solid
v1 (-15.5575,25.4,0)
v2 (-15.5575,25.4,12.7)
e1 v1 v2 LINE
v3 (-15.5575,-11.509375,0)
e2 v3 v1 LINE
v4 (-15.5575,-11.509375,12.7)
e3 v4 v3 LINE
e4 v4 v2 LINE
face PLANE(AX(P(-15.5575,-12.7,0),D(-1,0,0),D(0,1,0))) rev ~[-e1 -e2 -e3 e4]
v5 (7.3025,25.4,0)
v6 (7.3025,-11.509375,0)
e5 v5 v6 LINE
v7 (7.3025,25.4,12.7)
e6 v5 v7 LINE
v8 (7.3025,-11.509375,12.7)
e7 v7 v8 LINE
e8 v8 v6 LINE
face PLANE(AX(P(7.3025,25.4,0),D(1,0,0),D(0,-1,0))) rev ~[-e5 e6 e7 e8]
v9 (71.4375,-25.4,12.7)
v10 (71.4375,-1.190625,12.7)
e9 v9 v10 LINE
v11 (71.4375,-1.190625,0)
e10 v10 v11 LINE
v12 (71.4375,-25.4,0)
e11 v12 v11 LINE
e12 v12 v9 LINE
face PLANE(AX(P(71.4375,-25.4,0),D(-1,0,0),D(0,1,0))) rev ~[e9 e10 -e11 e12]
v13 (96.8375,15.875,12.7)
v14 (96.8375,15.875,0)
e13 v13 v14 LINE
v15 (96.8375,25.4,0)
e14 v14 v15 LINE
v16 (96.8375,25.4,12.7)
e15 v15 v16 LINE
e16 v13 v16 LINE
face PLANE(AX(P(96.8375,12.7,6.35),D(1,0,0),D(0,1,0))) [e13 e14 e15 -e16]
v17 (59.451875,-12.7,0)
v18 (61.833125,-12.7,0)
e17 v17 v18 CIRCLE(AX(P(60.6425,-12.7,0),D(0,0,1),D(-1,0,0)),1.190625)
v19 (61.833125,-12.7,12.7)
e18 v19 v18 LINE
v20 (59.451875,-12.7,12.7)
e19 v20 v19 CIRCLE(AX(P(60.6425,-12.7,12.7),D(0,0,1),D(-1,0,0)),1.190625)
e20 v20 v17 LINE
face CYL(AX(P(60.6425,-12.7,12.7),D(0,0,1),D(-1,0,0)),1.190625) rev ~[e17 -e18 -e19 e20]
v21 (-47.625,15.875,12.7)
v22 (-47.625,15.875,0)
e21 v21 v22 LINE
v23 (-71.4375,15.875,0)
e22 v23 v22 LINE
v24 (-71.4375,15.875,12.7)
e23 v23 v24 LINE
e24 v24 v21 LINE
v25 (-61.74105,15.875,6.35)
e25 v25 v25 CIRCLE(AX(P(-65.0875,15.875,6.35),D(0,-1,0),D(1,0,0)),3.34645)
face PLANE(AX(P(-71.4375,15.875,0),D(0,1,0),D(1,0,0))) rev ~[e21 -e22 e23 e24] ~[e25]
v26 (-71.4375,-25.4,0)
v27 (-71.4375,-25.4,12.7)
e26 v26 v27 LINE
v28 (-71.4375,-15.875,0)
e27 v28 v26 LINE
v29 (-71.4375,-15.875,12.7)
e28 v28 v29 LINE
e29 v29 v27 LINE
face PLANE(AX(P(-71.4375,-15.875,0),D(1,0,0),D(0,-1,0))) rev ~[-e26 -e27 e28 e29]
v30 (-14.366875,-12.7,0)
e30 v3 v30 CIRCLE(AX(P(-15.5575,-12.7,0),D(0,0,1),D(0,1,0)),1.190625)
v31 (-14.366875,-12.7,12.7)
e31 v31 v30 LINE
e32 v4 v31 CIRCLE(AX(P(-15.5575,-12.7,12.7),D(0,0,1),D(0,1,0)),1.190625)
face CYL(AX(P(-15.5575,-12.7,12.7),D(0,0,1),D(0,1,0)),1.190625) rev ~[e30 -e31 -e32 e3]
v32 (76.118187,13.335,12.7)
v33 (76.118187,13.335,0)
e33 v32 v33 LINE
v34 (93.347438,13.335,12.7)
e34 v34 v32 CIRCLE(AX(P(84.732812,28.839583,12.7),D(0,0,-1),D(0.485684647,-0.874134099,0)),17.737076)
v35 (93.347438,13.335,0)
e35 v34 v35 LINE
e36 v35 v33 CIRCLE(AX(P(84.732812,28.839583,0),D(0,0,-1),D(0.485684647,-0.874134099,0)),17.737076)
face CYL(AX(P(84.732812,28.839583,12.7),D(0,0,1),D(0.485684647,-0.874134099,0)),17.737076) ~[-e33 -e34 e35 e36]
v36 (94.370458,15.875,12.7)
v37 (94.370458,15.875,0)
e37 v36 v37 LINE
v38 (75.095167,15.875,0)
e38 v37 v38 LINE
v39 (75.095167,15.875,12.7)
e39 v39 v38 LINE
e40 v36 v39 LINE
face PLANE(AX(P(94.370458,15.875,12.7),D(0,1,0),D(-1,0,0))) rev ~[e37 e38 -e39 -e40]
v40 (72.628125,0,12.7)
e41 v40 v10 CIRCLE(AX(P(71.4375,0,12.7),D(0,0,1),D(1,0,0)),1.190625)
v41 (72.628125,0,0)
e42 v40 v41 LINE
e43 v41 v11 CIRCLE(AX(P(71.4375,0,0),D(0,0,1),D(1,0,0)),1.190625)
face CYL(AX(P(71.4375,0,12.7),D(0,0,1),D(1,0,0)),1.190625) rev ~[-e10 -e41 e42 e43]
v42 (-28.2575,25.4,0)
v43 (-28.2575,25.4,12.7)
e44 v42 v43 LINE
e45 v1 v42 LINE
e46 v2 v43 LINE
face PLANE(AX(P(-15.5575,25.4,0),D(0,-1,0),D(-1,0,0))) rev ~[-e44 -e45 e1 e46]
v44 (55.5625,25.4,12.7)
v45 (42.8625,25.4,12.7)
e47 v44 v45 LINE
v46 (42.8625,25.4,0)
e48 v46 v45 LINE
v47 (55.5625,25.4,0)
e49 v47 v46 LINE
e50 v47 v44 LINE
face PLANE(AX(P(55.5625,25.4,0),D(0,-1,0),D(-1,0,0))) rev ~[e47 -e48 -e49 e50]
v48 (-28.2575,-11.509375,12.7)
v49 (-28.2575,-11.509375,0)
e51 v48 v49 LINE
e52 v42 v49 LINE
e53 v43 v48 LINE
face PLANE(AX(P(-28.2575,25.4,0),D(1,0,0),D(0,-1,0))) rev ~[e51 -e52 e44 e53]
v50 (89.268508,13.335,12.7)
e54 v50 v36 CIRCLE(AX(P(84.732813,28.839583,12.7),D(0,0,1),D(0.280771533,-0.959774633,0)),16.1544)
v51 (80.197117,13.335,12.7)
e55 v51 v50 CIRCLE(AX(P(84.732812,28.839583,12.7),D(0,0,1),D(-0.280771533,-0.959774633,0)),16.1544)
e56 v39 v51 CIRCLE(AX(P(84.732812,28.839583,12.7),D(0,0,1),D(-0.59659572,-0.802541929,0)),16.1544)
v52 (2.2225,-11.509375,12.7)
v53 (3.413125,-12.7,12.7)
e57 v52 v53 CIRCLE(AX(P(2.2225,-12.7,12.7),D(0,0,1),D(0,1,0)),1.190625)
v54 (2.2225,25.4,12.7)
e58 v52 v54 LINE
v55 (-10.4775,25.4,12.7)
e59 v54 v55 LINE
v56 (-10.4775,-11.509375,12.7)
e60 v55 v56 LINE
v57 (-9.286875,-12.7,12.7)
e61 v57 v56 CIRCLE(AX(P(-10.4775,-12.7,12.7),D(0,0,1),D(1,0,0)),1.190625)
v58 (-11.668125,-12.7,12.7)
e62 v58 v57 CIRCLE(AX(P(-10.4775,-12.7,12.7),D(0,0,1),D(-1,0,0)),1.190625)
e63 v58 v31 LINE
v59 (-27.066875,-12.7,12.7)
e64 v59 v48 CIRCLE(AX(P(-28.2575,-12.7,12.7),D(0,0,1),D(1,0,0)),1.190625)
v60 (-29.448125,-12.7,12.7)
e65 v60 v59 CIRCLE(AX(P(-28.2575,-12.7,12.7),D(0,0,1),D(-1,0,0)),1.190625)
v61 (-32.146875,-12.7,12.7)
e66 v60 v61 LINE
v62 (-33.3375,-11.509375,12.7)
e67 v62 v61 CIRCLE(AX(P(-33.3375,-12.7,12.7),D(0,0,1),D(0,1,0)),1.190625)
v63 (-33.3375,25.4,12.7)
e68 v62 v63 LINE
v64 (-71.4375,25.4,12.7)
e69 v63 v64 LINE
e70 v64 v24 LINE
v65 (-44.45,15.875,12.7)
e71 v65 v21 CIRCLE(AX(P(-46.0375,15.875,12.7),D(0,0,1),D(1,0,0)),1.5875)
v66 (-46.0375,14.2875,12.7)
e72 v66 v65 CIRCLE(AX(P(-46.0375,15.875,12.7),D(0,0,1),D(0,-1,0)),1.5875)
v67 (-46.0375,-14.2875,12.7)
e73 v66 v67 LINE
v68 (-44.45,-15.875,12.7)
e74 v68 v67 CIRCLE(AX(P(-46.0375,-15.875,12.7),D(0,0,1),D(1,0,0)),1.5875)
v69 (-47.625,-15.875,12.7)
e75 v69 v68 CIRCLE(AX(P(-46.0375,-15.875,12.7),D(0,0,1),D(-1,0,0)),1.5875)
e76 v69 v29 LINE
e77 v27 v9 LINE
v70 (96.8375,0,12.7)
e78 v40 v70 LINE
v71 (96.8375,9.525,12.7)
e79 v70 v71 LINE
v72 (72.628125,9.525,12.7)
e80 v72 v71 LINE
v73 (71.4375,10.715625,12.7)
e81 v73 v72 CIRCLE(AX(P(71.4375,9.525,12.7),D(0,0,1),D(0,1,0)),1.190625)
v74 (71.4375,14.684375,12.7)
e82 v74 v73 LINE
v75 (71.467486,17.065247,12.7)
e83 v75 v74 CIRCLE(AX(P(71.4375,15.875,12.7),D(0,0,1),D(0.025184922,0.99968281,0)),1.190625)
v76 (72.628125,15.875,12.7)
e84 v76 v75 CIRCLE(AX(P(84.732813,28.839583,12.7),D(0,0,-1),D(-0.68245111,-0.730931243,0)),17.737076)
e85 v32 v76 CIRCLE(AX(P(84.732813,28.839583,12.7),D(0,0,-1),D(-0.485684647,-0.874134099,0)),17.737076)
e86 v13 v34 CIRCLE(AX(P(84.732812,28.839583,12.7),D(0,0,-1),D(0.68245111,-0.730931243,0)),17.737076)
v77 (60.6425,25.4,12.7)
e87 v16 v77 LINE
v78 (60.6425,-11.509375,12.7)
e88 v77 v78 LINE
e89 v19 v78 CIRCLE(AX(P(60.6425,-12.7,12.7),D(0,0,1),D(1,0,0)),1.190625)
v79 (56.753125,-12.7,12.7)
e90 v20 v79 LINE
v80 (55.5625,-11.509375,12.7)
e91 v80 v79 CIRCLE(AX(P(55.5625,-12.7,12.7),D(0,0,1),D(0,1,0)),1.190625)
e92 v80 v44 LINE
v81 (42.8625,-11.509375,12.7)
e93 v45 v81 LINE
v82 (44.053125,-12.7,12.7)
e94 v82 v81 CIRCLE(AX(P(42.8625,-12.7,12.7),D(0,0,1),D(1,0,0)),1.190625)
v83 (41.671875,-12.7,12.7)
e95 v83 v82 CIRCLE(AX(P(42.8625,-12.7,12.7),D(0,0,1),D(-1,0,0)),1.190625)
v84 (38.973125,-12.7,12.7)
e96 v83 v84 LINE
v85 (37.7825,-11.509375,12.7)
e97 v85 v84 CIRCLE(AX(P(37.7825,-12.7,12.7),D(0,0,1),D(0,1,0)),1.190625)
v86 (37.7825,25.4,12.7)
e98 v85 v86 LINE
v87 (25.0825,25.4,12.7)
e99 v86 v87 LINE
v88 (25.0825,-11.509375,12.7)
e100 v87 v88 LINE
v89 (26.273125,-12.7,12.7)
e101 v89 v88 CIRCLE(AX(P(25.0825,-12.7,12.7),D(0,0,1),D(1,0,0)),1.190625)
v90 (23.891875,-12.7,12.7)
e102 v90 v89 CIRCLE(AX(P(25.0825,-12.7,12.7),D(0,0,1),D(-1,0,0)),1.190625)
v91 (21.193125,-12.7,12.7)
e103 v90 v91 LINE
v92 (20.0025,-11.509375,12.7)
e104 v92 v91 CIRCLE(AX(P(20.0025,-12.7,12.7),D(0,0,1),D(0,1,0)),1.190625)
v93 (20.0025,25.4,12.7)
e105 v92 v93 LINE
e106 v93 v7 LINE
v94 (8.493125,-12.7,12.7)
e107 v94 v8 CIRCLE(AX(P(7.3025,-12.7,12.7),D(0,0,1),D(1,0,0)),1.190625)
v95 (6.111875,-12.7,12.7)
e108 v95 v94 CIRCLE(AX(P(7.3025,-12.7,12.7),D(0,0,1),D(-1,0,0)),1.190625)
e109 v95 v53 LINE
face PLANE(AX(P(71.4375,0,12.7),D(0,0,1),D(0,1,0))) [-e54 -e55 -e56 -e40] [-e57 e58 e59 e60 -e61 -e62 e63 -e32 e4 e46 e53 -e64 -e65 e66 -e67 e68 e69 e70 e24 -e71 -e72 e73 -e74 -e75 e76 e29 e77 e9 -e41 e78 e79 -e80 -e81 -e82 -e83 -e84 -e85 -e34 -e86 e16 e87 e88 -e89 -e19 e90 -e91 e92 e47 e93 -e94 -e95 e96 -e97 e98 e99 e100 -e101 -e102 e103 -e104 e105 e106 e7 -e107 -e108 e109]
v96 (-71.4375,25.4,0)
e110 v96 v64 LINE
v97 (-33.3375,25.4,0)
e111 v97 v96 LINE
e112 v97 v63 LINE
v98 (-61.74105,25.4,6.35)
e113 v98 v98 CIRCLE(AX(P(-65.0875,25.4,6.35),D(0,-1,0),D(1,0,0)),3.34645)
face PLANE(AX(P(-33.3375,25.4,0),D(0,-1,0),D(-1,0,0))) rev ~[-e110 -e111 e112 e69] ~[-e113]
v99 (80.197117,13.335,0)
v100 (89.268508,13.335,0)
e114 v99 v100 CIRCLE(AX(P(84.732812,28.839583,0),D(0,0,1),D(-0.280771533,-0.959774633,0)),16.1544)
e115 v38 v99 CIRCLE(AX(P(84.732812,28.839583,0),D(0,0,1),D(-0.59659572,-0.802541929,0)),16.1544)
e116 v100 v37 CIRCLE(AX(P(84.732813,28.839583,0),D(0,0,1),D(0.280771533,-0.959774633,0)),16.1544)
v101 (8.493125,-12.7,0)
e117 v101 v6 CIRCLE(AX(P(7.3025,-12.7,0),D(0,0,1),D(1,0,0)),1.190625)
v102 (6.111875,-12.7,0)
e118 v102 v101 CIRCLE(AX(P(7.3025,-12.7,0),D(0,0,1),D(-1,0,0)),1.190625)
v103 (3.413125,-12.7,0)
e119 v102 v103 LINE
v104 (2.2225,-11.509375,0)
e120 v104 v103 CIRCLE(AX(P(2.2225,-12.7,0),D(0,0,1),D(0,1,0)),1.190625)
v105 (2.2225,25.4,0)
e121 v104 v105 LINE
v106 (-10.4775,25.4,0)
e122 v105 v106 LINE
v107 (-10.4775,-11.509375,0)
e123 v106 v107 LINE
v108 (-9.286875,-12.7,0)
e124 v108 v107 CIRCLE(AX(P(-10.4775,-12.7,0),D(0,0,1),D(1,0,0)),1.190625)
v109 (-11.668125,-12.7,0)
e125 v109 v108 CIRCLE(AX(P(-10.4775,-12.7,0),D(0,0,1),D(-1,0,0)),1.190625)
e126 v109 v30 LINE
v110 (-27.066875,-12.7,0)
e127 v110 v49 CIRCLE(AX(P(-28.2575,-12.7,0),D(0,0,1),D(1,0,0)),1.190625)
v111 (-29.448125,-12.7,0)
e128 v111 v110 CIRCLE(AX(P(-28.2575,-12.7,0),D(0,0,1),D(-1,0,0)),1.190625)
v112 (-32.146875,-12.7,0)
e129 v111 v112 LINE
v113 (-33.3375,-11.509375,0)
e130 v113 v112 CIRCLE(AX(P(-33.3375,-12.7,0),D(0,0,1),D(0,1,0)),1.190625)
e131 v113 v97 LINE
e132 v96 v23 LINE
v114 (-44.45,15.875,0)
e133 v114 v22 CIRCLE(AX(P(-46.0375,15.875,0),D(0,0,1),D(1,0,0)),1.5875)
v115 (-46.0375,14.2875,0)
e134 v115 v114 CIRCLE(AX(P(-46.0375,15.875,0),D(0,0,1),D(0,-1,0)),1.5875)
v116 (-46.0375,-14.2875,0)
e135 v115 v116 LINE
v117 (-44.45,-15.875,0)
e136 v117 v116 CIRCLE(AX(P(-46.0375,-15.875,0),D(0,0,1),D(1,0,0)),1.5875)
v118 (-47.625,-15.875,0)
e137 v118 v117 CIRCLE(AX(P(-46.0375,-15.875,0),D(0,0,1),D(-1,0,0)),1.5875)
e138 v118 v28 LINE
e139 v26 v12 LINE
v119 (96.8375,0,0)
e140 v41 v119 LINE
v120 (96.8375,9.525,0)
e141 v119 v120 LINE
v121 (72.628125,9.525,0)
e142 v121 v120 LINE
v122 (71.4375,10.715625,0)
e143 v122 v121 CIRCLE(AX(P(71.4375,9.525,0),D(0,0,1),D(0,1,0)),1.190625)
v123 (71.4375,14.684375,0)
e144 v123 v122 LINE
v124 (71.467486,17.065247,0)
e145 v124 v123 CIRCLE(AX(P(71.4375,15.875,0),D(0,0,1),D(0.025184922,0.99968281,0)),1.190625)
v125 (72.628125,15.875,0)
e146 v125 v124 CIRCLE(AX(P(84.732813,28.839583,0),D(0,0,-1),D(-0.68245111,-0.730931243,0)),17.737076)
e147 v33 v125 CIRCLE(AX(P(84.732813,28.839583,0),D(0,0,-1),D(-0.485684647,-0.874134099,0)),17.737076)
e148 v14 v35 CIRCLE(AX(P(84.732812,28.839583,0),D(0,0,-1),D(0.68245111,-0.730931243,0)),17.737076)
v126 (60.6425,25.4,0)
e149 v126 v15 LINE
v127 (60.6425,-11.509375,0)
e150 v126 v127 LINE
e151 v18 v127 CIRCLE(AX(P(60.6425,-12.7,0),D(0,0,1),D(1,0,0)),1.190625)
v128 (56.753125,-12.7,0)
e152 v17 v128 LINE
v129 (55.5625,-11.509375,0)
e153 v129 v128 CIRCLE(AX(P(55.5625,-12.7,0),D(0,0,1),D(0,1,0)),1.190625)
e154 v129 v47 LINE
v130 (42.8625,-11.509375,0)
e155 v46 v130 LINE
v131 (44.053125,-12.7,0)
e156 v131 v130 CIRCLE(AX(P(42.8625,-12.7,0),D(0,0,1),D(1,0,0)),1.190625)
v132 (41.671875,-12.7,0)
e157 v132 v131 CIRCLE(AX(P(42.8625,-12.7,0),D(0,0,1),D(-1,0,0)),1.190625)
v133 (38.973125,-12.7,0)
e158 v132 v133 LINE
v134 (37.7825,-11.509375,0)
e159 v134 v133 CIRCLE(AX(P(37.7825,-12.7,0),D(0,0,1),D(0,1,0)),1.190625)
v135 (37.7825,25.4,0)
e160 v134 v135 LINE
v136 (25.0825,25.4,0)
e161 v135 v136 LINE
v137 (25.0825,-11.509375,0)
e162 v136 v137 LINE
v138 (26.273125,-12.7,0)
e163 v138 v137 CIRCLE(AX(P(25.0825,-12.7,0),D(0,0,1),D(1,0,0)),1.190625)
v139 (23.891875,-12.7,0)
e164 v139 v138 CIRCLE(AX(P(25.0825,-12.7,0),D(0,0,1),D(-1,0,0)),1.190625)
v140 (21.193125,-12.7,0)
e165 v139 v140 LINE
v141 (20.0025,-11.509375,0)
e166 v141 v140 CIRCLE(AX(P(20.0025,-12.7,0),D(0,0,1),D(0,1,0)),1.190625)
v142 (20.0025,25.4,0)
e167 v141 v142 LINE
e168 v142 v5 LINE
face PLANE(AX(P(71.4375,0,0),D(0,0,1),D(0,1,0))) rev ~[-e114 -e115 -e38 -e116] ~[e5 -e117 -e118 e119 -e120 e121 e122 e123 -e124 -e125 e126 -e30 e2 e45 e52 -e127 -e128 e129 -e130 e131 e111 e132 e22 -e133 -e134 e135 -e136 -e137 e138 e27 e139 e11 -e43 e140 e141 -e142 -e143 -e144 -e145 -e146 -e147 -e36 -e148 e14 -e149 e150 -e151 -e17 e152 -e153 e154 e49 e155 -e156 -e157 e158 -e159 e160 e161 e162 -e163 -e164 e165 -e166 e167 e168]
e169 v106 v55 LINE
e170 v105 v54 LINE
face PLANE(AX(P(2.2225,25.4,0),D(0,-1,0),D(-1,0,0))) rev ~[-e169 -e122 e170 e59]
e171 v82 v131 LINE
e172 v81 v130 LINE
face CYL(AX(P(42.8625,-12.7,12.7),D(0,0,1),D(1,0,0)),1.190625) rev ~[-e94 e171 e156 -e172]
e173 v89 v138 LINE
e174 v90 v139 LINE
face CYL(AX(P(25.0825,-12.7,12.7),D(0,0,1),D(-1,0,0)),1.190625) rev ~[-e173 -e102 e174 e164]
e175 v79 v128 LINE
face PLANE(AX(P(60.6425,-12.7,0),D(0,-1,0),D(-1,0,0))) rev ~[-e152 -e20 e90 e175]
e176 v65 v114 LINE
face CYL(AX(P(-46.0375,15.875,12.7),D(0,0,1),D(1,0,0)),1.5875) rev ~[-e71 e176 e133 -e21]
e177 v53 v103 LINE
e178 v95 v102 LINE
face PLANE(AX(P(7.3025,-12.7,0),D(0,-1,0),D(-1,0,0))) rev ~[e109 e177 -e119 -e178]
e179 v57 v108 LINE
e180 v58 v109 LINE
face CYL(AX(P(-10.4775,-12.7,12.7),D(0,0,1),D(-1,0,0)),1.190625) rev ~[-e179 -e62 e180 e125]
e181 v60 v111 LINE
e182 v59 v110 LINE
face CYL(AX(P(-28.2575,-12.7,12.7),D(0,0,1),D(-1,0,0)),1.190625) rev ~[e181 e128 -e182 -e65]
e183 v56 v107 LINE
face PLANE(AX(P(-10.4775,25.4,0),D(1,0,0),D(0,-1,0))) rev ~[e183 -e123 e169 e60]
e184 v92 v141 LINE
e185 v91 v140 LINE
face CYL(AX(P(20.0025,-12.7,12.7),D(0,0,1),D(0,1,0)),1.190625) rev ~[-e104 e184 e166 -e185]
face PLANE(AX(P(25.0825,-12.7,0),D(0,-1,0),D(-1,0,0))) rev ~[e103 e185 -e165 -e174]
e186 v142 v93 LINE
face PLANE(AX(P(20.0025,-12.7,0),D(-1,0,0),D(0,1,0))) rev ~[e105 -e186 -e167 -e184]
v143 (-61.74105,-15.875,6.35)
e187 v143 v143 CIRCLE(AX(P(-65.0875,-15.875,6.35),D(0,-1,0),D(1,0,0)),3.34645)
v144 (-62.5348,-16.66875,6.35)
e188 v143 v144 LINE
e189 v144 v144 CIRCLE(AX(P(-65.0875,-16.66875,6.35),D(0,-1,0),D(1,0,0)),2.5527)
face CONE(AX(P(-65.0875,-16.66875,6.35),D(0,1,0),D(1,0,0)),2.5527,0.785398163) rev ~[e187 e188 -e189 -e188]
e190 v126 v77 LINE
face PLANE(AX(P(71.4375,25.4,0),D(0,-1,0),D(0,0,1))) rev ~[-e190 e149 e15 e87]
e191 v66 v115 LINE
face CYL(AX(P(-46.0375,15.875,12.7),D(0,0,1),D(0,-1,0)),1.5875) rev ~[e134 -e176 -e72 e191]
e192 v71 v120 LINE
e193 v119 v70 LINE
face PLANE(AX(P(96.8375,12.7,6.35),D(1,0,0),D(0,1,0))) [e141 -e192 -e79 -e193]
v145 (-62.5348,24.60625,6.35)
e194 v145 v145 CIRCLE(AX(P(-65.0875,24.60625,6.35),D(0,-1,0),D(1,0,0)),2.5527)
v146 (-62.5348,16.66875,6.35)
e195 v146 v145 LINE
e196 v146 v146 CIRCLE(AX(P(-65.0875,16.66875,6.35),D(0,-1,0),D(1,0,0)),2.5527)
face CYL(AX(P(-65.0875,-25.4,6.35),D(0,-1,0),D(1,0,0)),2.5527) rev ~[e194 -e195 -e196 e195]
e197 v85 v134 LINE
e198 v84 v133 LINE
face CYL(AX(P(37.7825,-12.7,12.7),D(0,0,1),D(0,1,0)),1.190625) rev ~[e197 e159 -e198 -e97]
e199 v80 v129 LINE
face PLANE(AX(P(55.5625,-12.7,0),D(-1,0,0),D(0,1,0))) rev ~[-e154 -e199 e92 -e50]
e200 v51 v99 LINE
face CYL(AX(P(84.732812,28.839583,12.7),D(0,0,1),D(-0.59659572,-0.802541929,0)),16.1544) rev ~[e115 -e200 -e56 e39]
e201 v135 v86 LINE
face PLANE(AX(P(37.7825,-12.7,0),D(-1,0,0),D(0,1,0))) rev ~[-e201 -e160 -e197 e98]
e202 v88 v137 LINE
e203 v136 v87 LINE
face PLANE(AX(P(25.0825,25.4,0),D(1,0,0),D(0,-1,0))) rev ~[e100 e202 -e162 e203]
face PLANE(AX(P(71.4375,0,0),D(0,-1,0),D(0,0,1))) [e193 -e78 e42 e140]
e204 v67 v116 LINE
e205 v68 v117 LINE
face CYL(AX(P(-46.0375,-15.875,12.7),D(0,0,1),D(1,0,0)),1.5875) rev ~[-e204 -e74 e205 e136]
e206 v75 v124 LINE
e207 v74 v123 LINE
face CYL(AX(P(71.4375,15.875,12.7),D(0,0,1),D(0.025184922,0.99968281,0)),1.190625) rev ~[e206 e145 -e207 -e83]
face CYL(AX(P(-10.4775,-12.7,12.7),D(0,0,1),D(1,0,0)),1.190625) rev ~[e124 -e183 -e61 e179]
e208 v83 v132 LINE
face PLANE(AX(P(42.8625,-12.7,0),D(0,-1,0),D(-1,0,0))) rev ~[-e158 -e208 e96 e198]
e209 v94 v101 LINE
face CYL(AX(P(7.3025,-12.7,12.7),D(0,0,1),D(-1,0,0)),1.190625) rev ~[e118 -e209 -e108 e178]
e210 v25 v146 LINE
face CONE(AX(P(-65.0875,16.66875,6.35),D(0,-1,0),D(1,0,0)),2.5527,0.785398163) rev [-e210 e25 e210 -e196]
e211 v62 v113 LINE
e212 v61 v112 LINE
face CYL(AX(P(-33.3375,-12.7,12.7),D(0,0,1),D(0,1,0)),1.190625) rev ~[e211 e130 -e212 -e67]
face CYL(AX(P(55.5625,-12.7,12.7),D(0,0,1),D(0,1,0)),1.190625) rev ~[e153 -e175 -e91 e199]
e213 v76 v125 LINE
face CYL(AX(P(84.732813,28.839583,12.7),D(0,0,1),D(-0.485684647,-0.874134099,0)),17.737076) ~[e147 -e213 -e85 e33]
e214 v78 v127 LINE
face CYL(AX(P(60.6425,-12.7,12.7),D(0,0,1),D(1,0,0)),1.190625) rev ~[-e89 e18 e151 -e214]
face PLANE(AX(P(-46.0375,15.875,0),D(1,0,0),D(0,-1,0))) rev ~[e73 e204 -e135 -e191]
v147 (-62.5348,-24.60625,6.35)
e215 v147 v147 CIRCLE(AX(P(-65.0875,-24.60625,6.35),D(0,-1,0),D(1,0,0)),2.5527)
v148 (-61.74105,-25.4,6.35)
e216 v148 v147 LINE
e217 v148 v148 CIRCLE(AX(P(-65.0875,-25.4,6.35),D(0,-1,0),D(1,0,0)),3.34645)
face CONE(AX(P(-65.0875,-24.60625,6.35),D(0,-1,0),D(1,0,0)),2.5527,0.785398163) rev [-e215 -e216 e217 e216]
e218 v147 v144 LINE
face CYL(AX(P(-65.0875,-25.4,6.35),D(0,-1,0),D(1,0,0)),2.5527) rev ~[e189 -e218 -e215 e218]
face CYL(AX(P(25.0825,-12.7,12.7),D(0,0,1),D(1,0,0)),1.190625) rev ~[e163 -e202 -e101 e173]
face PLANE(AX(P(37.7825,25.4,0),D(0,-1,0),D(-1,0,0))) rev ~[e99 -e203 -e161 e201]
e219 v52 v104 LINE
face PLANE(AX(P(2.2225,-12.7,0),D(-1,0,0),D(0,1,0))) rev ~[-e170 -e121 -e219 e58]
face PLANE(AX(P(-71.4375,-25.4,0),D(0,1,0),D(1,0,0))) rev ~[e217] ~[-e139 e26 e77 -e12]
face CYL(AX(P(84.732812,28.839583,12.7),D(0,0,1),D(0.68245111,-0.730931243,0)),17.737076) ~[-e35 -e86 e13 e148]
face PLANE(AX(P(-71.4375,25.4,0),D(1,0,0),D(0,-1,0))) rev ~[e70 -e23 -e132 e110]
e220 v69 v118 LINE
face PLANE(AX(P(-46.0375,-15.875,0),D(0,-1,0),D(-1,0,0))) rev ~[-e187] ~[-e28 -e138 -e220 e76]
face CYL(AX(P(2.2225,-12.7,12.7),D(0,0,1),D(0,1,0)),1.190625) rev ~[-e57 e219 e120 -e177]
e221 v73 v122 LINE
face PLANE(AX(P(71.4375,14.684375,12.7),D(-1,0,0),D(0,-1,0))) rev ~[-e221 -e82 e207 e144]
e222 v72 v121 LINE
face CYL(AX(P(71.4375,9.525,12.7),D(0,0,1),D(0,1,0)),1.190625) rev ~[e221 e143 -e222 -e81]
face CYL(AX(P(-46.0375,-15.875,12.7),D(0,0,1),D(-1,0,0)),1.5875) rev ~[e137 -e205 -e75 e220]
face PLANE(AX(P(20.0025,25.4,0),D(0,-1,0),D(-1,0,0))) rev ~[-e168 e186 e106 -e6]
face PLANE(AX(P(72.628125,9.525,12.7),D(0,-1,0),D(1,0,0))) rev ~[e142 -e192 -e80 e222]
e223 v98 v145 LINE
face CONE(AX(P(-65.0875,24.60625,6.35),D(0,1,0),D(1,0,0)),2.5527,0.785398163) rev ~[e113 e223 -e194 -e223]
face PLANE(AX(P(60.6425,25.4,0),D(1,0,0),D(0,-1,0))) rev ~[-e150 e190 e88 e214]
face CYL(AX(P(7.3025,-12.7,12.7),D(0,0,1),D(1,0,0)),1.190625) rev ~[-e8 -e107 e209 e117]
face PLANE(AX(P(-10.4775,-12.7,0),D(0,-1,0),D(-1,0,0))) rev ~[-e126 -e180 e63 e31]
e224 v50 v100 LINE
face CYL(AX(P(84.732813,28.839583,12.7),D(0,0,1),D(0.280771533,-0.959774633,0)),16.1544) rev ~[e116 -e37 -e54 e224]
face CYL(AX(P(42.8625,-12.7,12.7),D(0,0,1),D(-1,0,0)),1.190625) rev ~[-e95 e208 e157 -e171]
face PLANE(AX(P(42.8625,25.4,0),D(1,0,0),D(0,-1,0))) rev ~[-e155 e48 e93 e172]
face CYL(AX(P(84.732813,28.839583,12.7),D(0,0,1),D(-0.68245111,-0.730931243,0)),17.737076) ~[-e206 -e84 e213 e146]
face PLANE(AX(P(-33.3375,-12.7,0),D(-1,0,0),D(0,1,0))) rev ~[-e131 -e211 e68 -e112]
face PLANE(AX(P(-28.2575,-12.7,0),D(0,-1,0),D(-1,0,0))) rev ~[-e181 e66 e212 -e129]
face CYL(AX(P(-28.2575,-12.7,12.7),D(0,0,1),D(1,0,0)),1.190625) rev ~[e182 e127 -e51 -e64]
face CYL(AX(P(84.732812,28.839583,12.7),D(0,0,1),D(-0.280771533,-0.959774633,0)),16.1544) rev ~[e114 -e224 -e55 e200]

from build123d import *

# Parameters (mm, degrees)
F0_DEPTH = 12.7
F1_R     = 2.5527
F2_DEPTH = 50.801
F3_SIZE  = 0.79375
F5_DEPTH = 12.701
F6_DEPTH = 12.7
F7_W     = 25.4
F7_H     = 12.7
F8_DEPTH = 25.4
F9_DEPTH = 12.7


# Not quite as in the source:
# - a feature names something its author has since deleted; it is built from what else it names


with BuildPart() as f0:
    # F10 (on Top) → F0 (new body)
    with BuildSketch(Plane.XY):
        Polygon((-71.4375, -15.875), (-71.4375, -25.4), (71.4375, -25.4), (71.4375, 25.4), (60.6425, 25.4), (60.6425, -12.7), (55.5625, -12.7), (55.5625, 25.4), (42.8625, 25.4), (42.8625, -12.7), (37.7825, -12.7), (37.7825, 25.4), (25.0825, 25.4), (25.0825, -12.7), (20.0025, -12.7), (20.0025, 25.4), (7.3025, 25.4), (7.3025, -12.7), (2.2225, -12.7), (2.2225, 25.4), (-10.4775, 25.4), (-10.4775, -12.7), (-15.5575, -12.7), (-15.5575, 25.4), (-28.2575, 25.4), (-28.2575, -12.7), (-33.3375, -12.7), (-33.3375, 25.4), (-71.4375, 25.4), (-71.4375, 15.875), (-46.0375, 15.875), (-46.0375, -15.875), align=None)
    extrude(amount=F0_DEPTH)

    # F1 (on face) → F2 (cut, through all)
    with BuildSketch(Plane.XZ.offset(25.4)):
        with Locations((-65.0875, 6.35)):
            Circle(F1_R)
    extrude(amount=-F2_DEPTH, mode=Mode.SUBTRACT)

    # F3
    f3_edges = [f0.edges().sort_by_distance(p)[0] for p in [
        (-67.6402, 15.875, 6.35),
        (-62.5348, 20.6375, 6.35),
        (-67.6402, 25.4, 6.35),
        (-67.6402, -25.4, 6.35),
        (-62.5348, -20.6375, 6.35),
        (-67.6402, -15.875, 6.35),
    ]]
    chamfer(f3_edges, length=F3_SIZE)

    # F4 (on face) → F5 (cut, through all)
    with BuildSketch(Plane.XY.offset(12.7)):
        with BuildLine():
            ThreePointArc((-46.0375, 14.2875), (-44.9149679849, 14.7524679849), (-44.45, 15.875))
            ThreePointArc((-44.45, 15.875), (-46.0375, 17.4625), (-47.625, 15.875))
            Line((-47.625, 15.875), (-46.0375, 15.875))
            Line((-46.0375, 15.875), (-46.0375, 14.2875))
        make_face()
        with BuildLine():
            ThreePointArc((-44.45, -15.875), (-44.9149679849, -14.7524679849), (-46.0375, -14.2875))
            Line((-46.0375, -14.2875), (-46.0375, -15.875))
            Line((-46.0375, -15.875), (-47.625, -15.875))
            ThreePointArc((-47.625, -15.875), (-46.0375, -17.4625), (-44.45, -15.875))
        make_face()
    extrude(amount=-F5_DEPTH, mode=Mode.SUBTRACT)

    # F4 (on face) → F6 (cut, through all)
    with BuildSketch(Plane.XY.offset(12.7)):
        with BuildLine():
            Line((-33.3375, -12.7), (-33.3375, -11.509375))
            ThreePointArc((-33.3375, -11.509375), (-34.1793990114, -13.5418990114), (-32.146875, -12.7))
            Line((-32.146875, -12.7), (-33.3375, -12.7))
        make_face()
        with BuildLine():
            Line((-28.2575, -12.7), (-29.448125, -12.7))
            ThreePointArc((-29.448125, -12.7), (-28.2575, -13.890625), (-27.066875, -12.7))
            ThreePointArc((-27.066875, -12.7), (-27.4156009886, -11.8581009886), (-28.2575, -11.509375))
            Line((-28.2575, -11.509375), (-28.2575, -12.7))
        make_face()
        with BuildLine():
            Line((-15.5575, -12.7), (-15.5575, -11.509375))
            ThreePointArc((-15.5575, -11.509375), (-16.3993990114, -13.5418990114), (-14.366875, -12.7))
            Line((-14.366875, -12.7), (-15.5575, -12.7))
        make_face()
        with BuildLine():
            Line((-10.4775, -12.7), (-11.668125, -12.7))
            ThreePointArc((-11.668125, -12.7), (-10.4775, -13.890625), (-9.286875, -12.7))
            ThreePointArc((-9.286875, -12.7), (-9.6356009886, -11.8581009886), (-10.4775, -11.509375))
            Line((-10.4775, -11.509375), (-10.4775, -12.7))
        make_face()
        with BuildLine():
            Line((2.2225, -12.7), (2.2225, -11.509375))
            ThreePointArc((2.2225, -11.509375), (1.3806009886, -13.5418990114), (3.413125, -12.7))
            Line((3.413125, -12.7), (2.2225, -12.7))
        make_face()
        with BuildLine():
            Line((7.3025, -12.7), (6.111875, -12.7))
            ThreePointArc((6.111875, -12.7), (7.3025, -13.890625), (8.493125, -12.7))
            ThreePointArc((8.493125, -12.7), (8.1443990114, -11.8581009886), (7.3025, -11.509375))
            Line((7.3025, -11.509375), (7.3025, -12.7))
        make_face()
        with BuildLine():
            Line((20.0025, -12.7), (20.0025, -11.509375))
            ThreePointArc((20.0025, -11.509375), (19.1606009886, -13.5418990114), (21.193125, -12.7))
            Line((21.193125, -12.7), (20.0025, -12.7))
        make_face()
        with BuildLine():
            ThreePointArc((26.273125, -12.7), (25.9243990114, -11.8581009886), (25.0825, -11.509375))
            Line((25.0825, -11.509375), (25.0825, -12.7))
            Line((25.0825, -12.7), (23.891875, -12.7))
            ThreePointArc((23.891875, -12.7), (25.0825, -13.890625), (26.273125, -12.7))
        make_face()
        with BuildLine():
            ThreePointArc((37.7825, -11.509375), (36.9406009886, -13.5418990114), (38.973125, -12.7))
            Line((38.973125, -12.7), (37.7825, -12.7))
            Line((37.7825, -12.7), (37.7825, -11.509375))
        make_face()
        with BuildLine():
            ThreePointArc((44.053125, -12.7), (43.7043990114, -11.8581009886), (42.8625, -11.509375))
            Line((42.8625, -11.509375), (42.8625, -12.7))
            Line((42.8625, -12.7), (41.671875, -12.7))
            ThreePointArc((41.671875, -12.7), (42.8625, -13.890625), (44.053125, -12.7))
        make_face()
        with BuildLine():
            ThreePointArc((55.5625, -11.509375), (54.7206009886, -13.5418990114), (56.753125, -12.7))
            Line((56.753125, -12.7), (55.5625, -12.7))
            Line((55.5625, -12.7), (55.5625, -11.509375))
        make_face()
        with BuildLine():
            ThreePointArc((61.833125, -12.7), (61.4843990114, -11.8581009886), (60.6425, -11.509375))
            Line((60.6425, -11.509375), (60.6425, -12.7))
            Line((60.6425, -12.7), (59.451875, -12.7))
            ThreePointArc((59.451875, -12.7), (60.6425, -13.890625), (61.833125, -12.7))
        make_face()
    extrude(amount=-F6_DEPTH, mode=Mode.SUBTRACT)

    # F7 (on face) → F8 (join)
    with BuildSketch(Plane.YZ.offset(71.4375)):
        with Locations((12.7, 6.35)):
            Rectangle(F7_W, F7_H)
    extrude(amount=F8_DEPTH)

    # F11 (on face) → F9 (cut, through all)
    with BuildSketch(Plane.XY.offset(12.7)):
        with BuildLine():
            Line((71.4375, 10.715625), (71.4375, 9.525))
            Line((71.4375, 9.525), (72.628125, 9.525))
            ThreePointArc((72.628125, 9.525), (72.2793990114, 10.3668990114), (71.4375, 10.715625))
        make_face()
        with BuildLine():
            Line((72.628125, 9.525), (71.4375, 9.525))
            Line((71.4375, 9.525), (71.4375, 10.715625))
            ThreePointArc((71.4375, 10.715625), (70.5956009886, 8.6831009886), (72.628125, 9.525))
        make_face()
        with BuildLine():
            ThreePointArc((71.4375, 10.715625), (72.2793990114, 10.3668990114), (72.628125, 9.525))
            Line((72.628125, 9.525), (96.8375, 9.525))
            Line((96.8375, 9.525), (96.8375, 13.335))
            Line((96.8375, 13.335), (93.3474382109, 13.335))
            ThreePointArc((93.3474382109, 13.335), (84.7328125, 11.1025068978), (76.1181867891, 13.335))
            Line((76.1181867891, 13.335), (71.4375, 13.335))
            Line((71.4375, 13.335), (71.4375, 10.715625))
        make_face()
        with BuildLine():
            Line((71.4375, 14.684375), (71.4375, 13.335))
            Line((71.4375, 13.335), (76.1181867891, 13.335))
            ThreePointArc((76.1181867891, 13.335), (74.2956009479, 14.4984363954), (72.628125, 15.875))
            ThreePointArc((72.628125, 15.875), (72.2793990114, 15.0331009886), (71.4375, 14.684375))
        make_face()
        with BuildLine():
            Line((93.3474382109, 13.335), (96.8375, 13.335))
            Line((96.8375, 13.335), (96.8375, 15.875))
            ThreePointArc((96.8375, 15.875), (95.1700240521, 14.4984363954), (93.3474382109, 13.335))
        make_face()
        with BuildLine():
            ThreePointArc((71.4674857978, 17.0652473451), (70.2469694175, 15.8899940879), (71.4375, 14.684375))
            Line((71.4375, 14.684375), (71.4375, 15.875))
            Line((71.4375, 15.875), (72.628125, 15.875))
            ThreePointArc((72.628125, 15.875), (72.0338528048, 16.4565181579), (71.4674857978, 17.0652473451))
        make_face()
        with BuildLine():
            Line((71.4375, 15.875), (71.4375, 14.684375))
            ThreePointArc((71.4375, 14.684375), (72.2793990114, 15.0331009886), (72.628125, 15.875))
            Line((72.628125, 15.875), (71.4375, 15.875))
        make_face()
        with BuildLine():
            Line((71.4375, 0), (72.628125, 0))
            ThreePointArc((72.628125, 0), (70.5956009886, 0.8418990114), (71.4375, -1.190625))
            Line((71.4375, -1.190625), (71.4375, 0))
        make_face()
        with BuildLine():
            ThreePointArc((75.0951666073, 15.875), (77.5332428869, 14.378226663), (80.1971168511, 13.335))
            Line((80.1971168511, 13.335), (89.2685081489, 13.335))
            ThreePointArc((89.2685081489, 13.335), (91.9323821131, 14.378226663), (94.3704583927, 15.875))
            Line((94.3704583927, 15.875), (75.0951666073, 15.875))
        make_face()
        with BuildLine():
            Line((89.2685081489, 13.335), (80.1971168511, 13.335))
            ThreePointArc((80.1971168511, 13.335), (84.7328125, 12.6851833333), (89.2685081489, 13.335))
        make_face()
    extrude(amount=-F9_DEPTH, mode=Mode.SUBTRACT)


solid = f0.part
